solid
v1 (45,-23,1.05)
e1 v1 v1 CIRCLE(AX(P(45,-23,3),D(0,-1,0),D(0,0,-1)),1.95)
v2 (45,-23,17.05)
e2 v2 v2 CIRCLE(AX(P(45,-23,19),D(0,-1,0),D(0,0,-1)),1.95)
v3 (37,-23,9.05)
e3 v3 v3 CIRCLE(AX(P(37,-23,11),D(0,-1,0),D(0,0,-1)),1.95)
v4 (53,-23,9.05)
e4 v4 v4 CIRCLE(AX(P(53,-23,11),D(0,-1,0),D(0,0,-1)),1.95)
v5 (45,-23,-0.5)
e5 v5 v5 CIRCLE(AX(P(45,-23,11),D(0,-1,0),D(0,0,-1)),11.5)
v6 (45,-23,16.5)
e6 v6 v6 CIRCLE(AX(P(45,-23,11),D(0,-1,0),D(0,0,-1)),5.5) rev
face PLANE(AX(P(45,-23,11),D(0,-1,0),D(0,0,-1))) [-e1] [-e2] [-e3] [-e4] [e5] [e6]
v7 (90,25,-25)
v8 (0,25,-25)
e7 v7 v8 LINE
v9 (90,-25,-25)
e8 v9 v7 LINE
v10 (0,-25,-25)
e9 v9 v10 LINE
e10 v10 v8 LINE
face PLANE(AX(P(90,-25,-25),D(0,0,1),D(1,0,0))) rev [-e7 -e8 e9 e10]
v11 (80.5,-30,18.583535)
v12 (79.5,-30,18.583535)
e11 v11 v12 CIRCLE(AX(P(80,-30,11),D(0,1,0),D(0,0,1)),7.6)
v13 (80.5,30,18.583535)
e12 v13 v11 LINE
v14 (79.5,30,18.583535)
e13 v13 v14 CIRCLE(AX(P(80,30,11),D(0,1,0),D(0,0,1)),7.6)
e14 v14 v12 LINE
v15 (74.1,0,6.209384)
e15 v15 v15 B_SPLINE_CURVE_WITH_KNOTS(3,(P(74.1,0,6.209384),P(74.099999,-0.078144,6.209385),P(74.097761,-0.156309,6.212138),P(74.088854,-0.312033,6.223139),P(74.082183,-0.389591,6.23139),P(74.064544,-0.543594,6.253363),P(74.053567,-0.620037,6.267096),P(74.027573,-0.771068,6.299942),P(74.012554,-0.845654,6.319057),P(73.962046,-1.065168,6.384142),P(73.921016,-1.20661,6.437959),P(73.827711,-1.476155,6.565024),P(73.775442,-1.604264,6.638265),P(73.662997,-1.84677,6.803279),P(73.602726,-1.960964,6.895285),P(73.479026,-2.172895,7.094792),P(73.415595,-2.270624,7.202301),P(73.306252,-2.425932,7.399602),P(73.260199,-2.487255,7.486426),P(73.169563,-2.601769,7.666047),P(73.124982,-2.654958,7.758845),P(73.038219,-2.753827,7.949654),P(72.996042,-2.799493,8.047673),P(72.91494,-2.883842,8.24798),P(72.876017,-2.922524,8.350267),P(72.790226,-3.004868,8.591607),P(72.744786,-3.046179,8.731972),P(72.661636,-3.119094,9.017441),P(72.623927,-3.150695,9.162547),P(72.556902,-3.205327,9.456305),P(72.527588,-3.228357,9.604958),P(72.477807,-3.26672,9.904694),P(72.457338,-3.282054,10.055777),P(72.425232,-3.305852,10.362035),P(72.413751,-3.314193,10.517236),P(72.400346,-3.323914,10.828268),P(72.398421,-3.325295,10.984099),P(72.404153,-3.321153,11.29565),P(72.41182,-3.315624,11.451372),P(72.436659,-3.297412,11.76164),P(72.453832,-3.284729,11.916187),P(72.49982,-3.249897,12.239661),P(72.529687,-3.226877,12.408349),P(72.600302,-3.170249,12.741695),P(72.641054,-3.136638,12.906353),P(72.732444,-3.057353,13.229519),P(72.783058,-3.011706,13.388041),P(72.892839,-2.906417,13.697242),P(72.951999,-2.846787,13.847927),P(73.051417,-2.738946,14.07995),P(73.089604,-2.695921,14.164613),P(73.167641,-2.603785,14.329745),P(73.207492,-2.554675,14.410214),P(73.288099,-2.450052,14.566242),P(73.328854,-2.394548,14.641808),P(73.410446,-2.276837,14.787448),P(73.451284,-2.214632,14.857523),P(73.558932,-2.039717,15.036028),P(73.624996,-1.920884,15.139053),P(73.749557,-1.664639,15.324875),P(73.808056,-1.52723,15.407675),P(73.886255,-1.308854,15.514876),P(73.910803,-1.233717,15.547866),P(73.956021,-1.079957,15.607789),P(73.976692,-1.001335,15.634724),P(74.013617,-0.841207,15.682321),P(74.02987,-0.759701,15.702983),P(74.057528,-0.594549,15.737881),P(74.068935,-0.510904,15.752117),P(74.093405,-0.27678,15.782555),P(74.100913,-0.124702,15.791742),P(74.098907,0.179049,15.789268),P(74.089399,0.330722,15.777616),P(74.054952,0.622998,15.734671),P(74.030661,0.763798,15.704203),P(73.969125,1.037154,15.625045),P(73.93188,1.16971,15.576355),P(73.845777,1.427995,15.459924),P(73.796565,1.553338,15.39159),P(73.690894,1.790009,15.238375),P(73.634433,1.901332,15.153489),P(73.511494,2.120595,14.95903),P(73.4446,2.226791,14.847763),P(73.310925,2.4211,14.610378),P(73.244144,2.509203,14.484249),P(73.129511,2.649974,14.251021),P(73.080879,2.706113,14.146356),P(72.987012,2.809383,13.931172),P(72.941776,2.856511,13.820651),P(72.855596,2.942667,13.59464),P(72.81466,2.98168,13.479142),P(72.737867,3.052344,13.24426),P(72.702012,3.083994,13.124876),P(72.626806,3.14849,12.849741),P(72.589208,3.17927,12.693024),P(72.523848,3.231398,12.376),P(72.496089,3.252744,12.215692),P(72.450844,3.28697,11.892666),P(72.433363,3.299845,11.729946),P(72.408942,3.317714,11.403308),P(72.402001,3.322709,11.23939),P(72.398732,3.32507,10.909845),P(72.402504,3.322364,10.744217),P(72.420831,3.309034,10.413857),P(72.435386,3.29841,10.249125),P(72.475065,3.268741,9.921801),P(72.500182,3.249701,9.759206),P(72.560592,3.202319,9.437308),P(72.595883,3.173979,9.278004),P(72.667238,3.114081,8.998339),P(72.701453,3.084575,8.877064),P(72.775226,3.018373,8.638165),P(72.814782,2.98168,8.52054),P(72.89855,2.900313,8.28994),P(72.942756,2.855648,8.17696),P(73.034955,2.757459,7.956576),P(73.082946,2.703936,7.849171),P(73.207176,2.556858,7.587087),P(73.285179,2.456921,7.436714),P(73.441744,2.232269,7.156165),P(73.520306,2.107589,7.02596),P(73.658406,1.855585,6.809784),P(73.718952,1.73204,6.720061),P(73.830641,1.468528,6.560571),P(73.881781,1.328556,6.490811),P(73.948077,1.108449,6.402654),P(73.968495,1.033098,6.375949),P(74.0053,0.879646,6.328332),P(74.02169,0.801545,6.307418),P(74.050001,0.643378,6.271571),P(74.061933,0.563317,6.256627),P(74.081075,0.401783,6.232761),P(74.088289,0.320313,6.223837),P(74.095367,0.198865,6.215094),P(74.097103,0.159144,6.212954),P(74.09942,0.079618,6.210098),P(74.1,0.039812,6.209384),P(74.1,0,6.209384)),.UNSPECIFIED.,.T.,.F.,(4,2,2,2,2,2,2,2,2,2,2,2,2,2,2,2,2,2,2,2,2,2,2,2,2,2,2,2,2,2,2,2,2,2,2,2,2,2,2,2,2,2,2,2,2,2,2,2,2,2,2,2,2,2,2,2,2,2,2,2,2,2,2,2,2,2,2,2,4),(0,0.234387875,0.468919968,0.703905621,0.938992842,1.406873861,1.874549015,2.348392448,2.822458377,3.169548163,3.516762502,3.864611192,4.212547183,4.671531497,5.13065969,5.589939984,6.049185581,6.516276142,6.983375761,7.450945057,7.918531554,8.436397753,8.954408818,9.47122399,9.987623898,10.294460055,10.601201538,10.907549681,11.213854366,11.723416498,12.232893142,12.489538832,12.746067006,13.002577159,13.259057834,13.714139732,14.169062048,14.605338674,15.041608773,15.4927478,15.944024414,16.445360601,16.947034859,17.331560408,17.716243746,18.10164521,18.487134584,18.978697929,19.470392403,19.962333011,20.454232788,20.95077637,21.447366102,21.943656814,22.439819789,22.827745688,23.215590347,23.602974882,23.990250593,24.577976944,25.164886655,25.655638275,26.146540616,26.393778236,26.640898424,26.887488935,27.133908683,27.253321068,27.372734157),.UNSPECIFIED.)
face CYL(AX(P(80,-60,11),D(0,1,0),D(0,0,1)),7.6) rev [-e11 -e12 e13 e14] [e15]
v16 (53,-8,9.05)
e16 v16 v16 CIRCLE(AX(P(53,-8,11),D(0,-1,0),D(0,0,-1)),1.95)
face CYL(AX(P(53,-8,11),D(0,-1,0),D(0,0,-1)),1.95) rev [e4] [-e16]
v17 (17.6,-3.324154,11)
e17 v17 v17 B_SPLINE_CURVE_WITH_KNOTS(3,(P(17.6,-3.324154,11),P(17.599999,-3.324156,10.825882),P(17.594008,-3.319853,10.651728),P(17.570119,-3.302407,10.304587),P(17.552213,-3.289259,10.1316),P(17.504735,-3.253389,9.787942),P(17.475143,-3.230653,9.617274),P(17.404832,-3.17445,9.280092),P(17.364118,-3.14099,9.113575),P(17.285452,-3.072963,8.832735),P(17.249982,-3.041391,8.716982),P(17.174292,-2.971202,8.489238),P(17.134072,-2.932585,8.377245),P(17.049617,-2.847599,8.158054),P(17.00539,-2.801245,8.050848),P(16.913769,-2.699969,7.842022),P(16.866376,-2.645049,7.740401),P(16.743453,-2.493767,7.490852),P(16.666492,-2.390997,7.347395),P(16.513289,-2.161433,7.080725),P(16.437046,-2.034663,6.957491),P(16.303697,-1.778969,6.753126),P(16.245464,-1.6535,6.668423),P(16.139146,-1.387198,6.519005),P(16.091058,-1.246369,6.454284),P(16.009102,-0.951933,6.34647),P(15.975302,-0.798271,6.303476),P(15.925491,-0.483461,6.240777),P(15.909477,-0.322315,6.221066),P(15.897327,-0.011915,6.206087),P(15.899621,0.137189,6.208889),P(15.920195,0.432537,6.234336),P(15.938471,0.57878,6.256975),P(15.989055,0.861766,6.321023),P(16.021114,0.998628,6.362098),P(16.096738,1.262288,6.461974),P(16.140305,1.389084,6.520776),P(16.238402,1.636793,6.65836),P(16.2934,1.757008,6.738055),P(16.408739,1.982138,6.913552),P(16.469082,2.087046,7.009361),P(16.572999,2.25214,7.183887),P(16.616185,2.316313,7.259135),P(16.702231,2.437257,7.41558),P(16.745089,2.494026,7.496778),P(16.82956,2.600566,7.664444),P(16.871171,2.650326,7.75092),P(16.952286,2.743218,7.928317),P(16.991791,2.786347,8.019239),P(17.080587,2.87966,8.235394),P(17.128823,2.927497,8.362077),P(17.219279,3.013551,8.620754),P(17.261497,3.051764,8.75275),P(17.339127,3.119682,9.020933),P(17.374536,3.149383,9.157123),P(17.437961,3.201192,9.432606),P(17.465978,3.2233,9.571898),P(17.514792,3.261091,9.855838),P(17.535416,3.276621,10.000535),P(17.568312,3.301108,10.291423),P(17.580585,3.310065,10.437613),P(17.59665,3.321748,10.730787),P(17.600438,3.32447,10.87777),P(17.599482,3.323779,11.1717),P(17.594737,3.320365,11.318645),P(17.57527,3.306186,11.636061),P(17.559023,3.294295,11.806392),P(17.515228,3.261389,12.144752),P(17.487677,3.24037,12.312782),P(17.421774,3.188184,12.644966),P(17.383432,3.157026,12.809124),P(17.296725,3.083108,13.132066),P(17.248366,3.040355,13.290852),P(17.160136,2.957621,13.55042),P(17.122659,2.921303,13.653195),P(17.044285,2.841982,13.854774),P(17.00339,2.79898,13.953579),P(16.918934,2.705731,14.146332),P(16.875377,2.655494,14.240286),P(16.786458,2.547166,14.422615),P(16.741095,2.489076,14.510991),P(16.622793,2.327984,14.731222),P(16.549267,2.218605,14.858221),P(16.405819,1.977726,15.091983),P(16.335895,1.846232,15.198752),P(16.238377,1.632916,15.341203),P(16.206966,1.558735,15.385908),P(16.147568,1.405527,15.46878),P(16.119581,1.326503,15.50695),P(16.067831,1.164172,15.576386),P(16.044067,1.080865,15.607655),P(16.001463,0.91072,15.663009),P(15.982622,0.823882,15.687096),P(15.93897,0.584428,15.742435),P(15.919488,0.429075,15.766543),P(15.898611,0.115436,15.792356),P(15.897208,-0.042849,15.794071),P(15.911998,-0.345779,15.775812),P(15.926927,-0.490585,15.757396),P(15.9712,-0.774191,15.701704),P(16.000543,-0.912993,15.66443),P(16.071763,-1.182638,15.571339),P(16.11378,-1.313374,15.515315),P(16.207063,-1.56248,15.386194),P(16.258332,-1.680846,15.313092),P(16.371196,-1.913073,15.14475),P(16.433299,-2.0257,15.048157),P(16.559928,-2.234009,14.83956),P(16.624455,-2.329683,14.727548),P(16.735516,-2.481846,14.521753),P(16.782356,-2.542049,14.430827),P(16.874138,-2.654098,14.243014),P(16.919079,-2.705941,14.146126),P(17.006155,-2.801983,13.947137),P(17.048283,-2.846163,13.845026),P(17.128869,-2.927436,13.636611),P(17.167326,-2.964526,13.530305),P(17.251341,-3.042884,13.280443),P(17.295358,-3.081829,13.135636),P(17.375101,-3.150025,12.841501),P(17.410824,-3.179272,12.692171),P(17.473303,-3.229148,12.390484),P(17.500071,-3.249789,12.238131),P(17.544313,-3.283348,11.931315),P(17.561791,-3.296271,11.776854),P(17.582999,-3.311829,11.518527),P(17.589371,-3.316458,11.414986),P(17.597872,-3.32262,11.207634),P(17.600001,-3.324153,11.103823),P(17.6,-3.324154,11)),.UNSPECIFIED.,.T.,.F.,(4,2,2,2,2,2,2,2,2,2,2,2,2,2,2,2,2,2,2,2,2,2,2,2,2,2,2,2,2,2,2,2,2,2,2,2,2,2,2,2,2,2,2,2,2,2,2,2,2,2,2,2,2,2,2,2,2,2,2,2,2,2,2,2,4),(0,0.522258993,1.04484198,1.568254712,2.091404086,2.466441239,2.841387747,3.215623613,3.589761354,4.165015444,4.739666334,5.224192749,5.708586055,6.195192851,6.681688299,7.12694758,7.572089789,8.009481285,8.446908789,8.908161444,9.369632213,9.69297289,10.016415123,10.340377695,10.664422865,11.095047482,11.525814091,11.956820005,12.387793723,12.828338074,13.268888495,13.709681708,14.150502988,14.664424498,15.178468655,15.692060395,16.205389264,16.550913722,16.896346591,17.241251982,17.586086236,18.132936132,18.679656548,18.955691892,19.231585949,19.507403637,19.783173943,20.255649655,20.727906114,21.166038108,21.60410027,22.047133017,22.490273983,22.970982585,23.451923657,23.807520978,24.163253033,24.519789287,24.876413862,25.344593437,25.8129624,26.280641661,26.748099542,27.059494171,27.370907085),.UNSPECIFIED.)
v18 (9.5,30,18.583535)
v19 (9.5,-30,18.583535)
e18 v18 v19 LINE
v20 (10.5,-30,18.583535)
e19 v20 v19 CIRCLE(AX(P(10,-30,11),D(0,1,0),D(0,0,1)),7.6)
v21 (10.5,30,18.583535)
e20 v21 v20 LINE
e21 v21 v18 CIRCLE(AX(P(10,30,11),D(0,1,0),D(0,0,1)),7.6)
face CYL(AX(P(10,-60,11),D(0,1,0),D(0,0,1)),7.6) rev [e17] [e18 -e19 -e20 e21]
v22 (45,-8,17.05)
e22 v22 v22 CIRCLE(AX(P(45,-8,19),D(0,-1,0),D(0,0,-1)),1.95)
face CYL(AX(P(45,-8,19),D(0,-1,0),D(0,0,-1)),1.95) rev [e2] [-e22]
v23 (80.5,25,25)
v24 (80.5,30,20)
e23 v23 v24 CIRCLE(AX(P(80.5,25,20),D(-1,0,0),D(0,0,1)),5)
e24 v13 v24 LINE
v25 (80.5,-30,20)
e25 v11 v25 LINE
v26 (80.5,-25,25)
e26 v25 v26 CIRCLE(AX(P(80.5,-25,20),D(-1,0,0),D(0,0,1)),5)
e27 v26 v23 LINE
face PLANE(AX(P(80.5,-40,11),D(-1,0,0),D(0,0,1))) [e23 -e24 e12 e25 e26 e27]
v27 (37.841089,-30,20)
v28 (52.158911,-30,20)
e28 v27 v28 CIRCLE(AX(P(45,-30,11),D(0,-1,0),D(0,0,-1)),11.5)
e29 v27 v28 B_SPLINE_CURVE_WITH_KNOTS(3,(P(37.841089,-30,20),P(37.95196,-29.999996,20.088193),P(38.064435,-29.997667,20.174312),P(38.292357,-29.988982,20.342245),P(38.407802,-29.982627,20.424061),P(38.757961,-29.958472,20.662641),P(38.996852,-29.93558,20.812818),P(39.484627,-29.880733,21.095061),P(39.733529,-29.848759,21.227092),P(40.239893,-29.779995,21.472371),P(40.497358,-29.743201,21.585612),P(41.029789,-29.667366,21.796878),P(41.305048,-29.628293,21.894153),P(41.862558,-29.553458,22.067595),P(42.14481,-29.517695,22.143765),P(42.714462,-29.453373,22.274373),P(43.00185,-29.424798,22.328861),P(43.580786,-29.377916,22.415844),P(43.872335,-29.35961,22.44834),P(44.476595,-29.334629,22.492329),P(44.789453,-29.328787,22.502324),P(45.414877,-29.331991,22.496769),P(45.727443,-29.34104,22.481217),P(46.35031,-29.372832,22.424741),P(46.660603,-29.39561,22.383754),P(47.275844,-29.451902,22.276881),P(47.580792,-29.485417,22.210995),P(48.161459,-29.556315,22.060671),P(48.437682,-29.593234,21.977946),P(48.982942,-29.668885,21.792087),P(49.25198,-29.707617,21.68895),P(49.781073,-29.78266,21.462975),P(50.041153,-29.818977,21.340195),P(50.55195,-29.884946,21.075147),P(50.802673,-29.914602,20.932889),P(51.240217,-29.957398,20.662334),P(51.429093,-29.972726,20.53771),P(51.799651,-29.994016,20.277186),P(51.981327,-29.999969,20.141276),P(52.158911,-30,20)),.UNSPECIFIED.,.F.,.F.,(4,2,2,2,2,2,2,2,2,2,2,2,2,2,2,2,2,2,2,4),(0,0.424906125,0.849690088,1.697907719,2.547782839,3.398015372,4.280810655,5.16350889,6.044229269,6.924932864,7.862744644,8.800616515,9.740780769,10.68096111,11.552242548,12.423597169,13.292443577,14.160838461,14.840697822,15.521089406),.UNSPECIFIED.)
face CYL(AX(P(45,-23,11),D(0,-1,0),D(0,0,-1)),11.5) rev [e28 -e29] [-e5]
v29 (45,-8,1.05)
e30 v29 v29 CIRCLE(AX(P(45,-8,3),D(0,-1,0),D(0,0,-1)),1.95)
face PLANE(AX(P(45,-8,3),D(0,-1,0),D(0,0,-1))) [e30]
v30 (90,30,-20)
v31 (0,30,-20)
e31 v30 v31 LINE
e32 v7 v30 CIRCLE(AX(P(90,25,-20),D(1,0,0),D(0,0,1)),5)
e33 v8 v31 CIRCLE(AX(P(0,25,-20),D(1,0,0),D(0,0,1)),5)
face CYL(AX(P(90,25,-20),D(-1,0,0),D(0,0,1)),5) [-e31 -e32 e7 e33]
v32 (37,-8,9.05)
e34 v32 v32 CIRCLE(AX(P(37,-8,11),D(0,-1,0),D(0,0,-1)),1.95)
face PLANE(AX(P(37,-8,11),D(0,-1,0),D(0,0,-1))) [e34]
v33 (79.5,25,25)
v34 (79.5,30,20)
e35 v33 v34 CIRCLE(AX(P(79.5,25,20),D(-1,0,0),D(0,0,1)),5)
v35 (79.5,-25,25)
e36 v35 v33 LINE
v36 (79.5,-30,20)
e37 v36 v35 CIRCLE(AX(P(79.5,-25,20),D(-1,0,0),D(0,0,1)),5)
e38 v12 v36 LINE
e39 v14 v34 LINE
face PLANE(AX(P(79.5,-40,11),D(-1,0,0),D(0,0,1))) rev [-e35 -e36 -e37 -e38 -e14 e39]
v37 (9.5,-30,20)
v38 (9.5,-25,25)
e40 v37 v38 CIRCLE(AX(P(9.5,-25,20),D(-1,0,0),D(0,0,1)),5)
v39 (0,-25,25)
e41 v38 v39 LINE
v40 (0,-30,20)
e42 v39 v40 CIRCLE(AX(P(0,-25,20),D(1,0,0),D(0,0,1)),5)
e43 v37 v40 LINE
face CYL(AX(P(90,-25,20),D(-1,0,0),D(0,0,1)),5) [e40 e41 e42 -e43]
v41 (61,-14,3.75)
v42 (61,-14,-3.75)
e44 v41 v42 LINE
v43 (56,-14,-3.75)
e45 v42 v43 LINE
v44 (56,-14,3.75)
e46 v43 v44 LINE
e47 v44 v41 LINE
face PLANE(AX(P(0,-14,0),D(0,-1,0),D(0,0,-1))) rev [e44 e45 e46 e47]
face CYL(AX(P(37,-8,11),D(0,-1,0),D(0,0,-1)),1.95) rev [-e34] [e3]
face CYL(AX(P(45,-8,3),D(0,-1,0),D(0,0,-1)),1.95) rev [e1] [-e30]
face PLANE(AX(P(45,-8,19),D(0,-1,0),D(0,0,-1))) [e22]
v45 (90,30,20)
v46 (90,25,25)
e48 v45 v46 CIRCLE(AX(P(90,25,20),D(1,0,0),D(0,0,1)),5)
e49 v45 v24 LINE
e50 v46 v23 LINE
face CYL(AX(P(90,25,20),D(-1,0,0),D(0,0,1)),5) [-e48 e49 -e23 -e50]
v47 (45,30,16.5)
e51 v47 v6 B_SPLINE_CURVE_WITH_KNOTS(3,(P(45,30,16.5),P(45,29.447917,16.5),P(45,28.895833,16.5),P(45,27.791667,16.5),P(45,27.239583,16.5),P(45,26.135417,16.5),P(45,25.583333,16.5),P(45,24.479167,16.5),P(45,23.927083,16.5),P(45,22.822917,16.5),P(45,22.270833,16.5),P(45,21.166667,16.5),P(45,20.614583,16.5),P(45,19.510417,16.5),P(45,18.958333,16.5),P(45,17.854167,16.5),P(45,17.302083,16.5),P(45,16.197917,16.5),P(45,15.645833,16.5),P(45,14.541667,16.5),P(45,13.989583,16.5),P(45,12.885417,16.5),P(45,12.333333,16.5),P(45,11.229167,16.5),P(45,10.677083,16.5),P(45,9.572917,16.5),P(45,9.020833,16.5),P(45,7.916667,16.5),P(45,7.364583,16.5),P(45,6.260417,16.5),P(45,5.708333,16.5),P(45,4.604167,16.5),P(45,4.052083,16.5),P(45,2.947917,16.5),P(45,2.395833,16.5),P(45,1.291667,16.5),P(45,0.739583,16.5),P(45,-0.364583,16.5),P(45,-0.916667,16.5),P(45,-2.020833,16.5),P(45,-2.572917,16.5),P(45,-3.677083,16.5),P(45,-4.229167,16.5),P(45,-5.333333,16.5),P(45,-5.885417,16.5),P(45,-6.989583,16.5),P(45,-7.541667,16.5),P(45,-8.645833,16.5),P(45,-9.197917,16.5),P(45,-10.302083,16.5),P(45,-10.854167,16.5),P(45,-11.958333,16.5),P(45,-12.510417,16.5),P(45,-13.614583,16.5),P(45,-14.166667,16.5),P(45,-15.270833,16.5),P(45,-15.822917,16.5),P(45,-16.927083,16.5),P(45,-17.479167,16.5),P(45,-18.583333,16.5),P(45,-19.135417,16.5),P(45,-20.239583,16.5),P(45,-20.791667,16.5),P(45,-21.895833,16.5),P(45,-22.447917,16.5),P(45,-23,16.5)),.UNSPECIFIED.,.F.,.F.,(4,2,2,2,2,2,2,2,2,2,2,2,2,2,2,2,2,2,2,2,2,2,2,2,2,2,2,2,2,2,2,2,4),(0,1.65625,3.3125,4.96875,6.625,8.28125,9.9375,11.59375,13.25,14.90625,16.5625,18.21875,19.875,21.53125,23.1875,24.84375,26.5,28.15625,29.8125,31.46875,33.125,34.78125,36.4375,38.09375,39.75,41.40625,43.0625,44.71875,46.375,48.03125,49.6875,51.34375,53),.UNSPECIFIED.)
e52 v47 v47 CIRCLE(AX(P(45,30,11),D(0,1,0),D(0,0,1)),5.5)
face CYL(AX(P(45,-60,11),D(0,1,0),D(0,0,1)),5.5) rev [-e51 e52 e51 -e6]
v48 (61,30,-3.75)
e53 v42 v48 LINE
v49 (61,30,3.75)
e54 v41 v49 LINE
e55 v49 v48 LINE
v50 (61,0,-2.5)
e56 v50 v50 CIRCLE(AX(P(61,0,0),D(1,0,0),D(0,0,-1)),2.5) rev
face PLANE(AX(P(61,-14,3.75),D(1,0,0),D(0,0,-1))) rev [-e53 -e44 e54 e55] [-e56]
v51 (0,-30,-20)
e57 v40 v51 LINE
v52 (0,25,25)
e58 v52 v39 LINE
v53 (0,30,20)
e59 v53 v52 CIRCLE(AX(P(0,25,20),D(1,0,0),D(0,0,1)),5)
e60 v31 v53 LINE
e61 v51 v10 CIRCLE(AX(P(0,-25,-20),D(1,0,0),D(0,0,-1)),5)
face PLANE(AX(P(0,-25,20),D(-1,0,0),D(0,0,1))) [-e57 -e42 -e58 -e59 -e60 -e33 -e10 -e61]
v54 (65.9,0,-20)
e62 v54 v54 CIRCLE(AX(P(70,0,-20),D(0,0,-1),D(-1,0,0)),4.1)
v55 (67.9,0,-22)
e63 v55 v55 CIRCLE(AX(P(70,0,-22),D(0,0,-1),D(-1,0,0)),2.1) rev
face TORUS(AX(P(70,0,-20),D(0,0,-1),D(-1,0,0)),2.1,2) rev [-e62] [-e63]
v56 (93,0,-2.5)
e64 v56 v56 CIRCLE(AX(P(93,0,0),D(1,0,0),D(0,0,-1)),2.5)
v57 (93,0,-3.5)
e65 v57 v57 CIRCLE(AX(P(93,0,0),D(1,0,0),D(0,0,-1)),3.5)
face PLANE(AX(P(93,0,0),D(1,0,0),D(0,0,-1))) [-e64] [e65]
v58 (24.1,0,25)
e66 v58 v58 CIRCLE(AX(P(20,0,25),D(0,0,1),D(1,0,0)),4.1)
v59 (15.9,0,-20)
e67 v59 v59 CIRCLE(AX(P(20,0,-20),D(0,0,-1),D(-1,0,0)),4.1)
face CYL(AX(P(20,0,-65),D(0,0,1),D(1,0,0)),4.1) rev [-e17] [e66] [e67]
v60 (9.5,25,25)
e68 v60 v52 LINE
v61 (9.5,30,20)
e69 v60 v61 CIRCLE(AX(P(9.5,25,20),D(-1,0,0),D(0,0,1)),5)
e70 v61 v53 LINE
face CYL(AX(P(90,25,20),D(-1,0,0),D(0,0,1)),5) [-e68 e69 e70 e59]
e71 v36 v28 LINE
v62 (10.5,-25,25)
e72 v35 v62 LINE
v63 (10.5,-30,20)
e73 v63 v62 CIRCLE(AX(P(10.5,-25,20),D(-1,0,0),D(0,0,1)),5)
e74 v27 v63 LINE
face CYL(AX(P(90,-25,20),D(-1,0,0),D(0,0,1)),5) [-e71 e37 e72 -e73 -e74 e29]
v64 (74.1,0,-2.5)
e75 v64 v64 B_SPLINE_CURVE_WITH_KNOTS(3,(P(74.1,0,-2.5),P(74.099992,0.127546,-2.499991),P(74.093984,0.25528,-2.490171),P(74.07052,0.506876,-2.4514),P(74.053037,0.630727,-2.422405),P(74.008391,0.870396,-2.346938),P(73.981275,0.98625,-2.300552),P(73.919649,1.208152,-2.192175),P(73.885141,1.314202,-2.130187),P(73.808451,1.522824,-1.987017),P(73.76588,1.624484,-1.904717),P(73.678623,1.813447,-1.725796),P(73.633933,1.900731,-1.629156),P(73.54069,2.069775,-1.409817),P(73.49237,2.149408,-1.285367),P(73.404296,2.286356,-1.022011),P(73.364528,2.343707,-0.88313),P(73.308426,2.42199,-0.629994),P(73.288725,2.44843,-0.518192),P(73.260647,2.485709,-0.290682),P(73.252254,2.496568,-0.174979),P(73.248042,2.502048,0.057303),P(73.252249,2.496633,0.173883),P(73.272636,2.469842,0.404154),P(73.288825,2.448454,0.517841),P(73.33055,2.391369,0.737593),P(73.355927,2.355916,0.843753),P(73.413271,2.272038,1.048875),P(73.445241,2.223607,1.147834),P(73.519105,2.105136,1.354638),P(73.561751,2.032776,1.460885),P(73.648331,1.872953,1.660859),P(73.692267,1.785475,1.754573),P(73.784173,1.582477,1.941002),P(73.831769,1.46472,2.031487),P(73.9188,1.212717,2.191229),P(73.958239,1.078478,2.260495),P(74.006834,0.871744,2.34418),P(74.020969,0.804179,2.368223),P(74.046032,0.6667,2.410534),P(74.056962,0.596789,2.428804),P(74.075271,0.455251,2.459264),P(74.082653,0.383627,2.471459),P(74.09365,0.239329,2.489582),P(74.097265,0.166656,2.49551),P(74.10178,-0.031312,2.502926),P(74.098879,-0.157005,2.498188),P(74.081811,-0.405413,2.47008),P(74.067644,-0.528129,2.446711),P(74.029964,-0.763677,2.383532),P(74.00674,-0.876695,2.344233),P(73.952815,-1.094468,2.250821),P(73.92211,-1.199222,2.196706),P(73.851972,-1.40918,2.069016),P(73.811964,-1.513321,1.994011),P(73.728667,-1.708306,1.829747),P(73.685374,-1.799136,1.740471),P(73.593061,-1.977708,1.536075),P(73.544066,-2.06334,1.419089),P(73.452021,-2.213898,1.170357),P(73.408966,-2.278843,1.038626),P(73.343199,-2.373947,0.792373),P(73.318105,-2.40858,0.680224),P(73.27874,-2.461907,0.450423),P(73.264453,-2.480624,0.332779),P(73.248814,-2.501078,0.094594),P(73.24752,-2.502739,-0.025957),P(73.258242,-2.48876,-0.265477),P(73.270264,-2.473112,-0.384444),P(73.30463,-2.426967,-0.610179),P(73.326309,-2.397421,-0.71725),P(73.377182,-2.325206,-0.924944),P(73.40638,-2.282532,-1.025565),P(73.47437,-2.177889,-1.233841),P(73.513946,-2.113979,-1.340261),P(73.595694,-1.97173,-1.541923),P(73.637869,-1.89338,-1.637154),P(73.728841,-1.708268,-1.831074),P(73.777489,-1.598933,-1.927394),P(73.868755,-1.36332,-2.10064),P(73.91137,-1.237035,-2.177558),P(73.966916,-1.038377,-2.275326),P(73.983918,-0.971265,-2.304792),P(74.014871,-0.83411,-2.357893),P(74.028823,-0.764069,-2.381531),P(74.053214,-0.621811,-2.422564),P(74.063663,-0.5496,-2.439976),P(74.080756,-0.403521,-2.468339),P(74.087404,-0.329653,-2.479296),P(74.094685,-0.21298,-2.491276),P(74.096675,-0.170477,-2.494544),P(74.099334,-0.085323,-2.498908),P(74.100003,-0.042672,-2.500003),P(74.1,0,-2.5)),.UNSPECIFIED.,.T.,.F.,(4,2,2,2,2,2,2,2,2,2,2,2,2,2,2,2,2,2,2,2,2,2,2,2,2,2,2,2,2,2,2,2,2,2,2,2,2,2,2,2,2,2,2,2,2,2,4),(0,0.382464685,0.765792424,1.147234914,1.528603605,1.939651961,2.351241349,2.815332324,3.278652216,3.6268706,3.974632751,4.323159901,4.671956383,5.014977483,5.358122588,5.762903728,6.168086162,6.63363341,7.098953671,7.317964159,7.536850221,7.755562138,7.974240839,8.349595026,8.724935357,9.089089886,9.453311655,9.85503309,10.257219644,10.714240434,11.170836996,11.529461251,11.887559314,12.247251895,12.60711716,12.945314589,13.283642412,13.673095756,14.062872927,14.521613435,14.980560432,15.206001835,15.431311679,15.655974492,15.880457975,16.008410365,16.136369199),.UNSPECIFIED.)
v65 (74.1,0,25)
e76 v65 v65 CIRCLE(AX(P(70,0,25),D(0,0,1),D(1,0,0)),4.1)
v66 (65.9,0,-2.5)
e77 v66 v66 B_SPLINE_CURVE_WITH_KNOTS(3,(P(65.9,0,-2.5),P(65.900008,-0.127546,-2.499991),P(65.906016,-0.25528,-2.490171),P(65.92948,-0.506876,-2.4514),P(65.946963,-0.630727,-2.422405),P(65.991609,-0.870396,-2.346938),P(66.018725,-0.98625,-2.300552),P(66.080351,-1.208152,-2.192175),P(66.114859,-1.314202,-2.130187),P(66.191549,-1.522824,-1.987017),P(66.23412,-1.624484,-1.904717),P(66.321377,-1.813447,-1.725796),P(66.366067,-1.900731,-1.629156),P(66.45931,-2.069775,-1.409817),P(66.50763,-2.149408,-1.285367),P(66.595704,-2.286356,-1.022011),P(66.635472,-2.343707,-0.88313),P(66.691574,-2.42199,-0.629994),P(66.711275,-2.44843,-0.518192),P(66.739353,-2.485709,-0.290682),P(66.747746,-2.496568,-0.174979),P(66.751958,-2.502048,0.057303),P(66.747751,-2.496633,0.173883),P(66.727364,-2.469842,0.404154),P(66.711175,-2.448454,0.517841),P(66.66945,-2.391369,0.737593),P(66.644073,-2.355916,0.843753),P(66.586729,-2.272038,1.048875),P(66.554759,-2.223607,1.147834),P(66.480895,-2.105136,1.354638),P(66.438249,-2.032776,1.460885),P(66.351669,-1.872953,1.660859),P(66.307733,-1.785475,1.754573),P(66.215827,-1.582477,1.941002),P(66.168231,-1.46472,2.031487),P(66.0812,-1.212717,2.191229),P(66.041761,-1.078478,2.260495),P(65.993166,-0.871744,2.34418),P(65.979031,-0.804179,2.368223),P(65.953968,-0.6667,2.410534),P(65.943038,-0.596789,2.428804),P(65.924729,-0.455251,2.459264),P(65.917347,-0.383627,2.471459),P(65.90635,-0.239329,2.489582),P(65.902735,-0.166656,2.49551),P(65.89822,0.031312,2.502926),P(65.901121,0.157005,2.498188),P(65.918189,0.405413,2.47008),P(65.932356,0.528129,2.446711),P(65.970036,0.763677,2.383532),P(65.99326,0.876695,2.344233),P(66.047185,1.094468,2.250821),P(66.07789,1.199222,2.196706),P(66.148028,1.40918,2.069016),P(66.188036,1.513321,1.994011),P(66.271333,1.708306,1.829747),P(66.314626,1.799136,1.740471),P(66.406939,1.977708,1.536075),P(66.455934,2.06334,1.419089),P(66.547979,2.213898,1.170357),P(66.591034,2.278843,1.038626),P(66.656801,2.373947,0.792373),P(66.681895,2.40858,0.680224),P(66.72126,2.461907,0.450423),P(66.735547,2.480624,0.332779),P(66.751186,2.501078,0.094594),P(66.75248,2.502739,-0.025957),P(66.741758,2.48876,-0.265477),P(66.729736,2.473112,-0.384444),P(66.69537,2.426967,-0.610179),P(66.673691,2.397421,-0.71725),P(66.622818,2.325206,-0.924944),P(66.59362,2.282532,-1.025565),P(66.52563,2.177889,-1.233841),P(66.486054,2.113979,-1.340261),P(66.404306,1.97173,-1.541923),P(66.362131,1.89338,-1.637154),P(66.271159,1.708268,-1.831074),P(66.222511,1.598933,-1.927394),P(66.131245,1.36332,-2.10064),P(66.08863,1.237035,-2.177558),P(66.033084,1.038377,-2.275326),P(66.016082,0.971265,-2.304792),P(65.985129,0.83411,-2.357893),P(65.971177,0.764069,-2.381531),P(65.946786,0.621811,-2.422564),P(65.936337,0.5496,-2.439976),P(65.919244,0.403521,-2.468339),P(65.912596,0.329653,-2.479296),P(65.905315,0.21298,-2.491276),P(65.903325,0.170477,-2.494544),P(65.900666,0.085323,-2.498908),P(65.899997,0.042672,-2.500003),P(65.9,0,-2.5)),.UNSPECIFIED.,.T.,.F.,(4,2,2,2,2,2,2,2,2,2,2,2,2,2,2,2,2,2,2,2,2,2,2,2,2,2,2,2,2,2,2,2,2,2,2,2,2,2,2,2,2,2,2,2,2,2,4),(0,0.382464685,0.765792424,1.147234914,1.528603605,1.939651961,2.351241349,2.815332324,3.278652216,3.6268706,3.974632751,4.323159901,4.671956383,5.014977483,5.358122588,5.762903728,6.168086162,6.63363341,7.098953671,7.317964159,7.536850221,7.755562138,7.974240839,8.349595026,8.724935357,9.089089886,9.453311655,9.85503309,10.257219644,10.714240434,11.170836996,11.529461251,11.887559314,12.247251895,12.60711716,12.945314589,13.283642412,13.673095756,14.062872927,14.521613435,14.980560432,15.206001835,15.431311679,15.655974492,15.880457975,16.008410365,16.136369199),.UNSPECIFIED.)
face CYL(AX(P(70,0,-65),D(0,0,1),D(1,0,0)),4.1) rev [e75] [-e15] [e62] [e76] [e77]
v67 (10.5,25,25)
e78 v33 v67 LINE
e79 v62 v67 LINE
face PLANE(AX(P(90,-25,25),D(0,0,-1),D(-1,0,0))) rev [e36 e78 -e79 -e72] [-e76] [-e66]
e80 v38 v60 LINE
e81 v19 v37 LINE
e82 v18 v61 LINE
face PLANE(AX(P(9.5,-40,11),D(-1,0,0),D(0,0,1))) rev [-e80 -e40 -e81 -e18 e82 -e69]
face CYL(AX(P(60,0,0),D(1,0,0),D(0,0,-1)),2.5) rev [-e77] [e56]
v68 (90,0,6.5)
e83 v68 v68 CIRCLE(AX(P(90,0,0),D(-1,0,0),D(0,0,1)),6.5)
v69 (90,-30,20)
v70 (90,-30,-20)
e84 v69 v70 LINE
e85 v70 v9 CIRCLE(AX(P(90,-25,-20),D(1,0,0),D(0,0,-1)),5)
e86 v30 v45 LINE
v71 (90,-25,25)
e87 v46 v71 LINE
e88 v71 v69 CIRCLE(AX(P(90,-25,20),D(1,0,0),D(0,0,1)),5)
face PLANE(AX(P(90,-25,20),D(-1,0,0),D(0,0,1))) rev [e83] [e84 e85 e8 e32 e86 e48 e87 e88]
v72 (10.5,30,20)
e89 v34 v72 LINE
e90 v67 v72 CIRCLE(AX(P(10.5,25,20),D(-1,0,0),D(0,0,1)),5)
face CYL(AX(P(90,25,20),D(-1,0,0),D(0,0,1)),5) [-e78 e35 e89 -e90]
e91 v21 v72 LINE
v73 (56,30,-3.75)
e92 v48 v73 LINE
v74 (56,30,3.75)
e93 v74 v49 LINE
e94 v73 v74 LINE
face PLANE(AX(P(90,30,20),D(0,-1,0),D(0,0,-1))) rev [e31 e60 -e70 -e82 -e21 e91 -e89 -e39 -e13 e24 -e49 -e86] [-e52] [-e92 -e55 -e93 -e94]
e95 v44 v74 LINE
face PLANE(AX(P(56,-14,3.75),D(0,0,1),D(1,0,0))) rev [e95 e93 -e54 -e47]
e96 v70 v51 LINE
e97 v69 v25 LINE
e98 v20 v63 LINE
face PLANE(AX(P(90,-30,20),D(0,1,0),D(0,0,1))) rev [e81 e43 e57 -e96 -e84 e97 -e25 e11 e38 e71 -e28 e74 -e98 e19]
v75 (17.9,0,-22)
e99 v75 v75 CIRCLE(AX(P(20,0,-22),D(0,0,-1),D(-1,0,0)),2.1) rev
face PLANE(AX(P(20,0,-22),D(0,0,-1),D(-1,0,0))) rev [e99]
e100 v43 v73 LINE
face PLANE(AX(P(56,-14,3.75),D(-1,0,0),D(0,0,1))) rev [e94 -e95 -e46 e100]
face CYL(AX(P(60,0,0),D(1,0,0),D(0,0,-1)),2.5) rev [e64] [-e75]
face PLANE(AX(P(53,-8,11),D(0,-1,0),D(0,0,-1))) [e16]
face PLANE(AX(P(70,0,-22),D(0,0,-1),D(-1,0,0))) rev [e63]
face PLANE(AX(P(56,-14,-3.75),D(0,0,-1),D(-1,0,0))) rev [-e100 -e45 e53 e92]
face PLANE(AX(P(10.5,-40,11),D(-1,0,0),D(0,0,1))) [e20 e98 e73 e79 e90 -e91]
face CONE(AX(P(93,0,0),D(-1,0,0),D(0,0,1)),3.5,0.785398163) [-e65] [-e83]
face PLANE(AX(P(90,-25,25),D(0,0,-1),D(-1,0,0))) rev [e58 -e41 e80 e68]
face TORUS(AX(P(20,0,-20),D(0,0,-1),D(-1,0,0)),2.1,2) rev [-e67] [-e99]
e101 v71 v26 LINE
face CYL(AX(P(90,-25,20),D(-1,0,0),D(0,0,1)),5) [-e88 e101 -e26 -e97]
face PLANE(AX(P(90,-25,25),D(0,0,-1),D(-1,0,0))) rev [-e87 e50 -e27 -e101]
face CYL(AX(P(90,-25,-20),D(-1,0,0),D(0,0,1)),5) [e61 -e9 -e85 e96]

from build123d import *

# Parameters (mm, degrees)
BOSS_EXTRUDE1_DEPTH     = 90
SKETCH2_R               = 7.6
SKETCH2_R_2             = 5.5
CUT_EXTRUDE1_DEPTH      = 90
SKETCH3_R               = 4.1
CUT_EXTRUDE2_DEPTH      = 90
SKETCH10_W              = 1
SKETCH10_H              = 31.35052841
CUT_EXTRUDE_THIN1_DEPTH = 70
SKETCH11_R              = 11.5
CUT_EXTRUDE6_DEPTH      = 7
SKETCH12_R              = 1.95
CUT_EXTRUDE7_DEPTH      = 15
BOSS_EXTRUDE2_START     = -3
SKETCH16_R              = 4.1
BOSS_EXTRUDE2_DEPTH     = 3
FILLET1_R               = 2
SKETCH17_R              = 2.5
CUT_EXTRUDE8_DEPTH      = 30
SKETCH18_W              = 5
SKETCH18_H              = 7.5
CUT_EXTRUDE9_DEPTH      = 44
BOSS_EXTRUDE3_START     = 3
SKETCH19_R              = 3.5
SKETCH19_R_2            = 2.5
BOSS_EXTRUDE3_DEPTH     = 3
CHAMFER1_SIZE           = 3


with BuildPart() as part:
    # Sketch1 → Boss-Extrude1 (new body)
    with BuildSketch(Plane(origin=(0, 0, 0), x_dir=(0, 0, -1), z_dir=(1, 0, 0))):
        with BuildLine():
            Line((-20, -30), (20, -30))
            ThreePointArc((20, -30), (23.535533906, -28.535533906), (25, -25))
            Line((25, -25), (25, 25))
            ThreePointArc((25, 25), (23.535533906, 28.535533906), (20, 30))
            Line((20, 30), (-20, 30))
            ThreePointArc((-20, 30), (-23.535533906, 28.535533906), (-25, 25))
            Line((-25, 25), (-25, -25))
            ThreePointArc((-25, -25), (-23.535533906, -28.535533906), (-20, -30))
        make_face()
    extrude(amount=BOSS_EXTRUDE1_DEPTH)

    # Sketch2 → Cut-Extrude1 (cut)
    with BuildSketch(Plane(origin=(0, 30, 0), x_dir=(1, 0, 0), z_dir=(0, 1, 0))):
        with Locations(Location((10, -11, 0), (0, 0, 270))):
            Circle(SKETCH2_R)
        with Locations(Location((80, -11, 0), (0, 0, 270))):
            Circle(SKETCH2_R)
        with Locations(Location((45, -11, 0), (0, 0, 270))):
            Circle(SKETCH2_R_2)
    extrude(amount=-CUT_EXTRUDE1_DEPTH, mode=Mode.SUBTRACT)

    # Sketch3 → Cut-Extrude2 (cut)
    with BuildSketch(Plane.XY.offset(25)):
        with Locations((20, 0)):
            Circle(SKETCH3_R)
        with Locations((70, 0)):
            Circle(SKETCH3_R)
    extrude(amount=-CUT_EXTRUDE2_DEPTH, mode=Mode.SUBTRACT)

    # Sketch10 → Cut-Extrude-Thin1 (cut)
    with BuildSketch(Plane(origin=(0, 30, 0), x_dir=(1, 0, 0), z_dir=(0, 1, 0))):
        with Locations((10, -26.675264205)):
            Rectangle(SKETCH10_W, SKETCH10_H)
        with Locations((80, -26.675264205)):
            Rectangle(SKETCH10_W, SKETCH10_H)
    extrude(amount=-CUT_EXTRUDE_THIN1_DEPTH, mode=Mode.SUBTRACT)

    # Sketch11 → Cut-Extrude6 (cut)
    with BuildSketch(Plane(origin=(0, -30, 0), x_dir=(-1, 0, 0), z_dir=(0, -1, 0))):
        with Locations(Location((-45, -11, 0), (0, 0, 90))):
            Circle(SKETCH11_R)
    extrude(amount=-CUT_EXTRUDE6_DEPTH, mode=Mode.SUBTRACT)

    # Sketch12 → Cut-Extrude7 (cut)
    with BuildSketch(Plane(origin=(0, -23, 0), x_dir=(-1, 0, 0), z_dir=(0, -1, 0))):
        with Locations(Location((-45, -19, 0), (0, 0, 90))):
            Circle(SKETCH12_R)
        with Locations(Location((-53, -11, 0), (0, 0, 90))):
            Circle(SKETCH12_R)
        with Locations(Location((-45, -3, 0), (0, 0, 90))):
            Circle(SKETCH12_R)
        with Locations(Location((-37, -11, 0), (0, 0, 90))):
            Circle(SKETCH12_R)
    extrude(amount=-CUT_EXTRUDE7_DEPTH, mode=Mode.SUBTRACT)

    # Sketch16 → Boss-Extrude2 (add)
    with BuildSketch(Plane(origin=(0, 0, -25), x_dir=(-1, 0, 0), z_dir=(0, 0, -1)).offset(BOSS_EXTRUDE2_START)):
        with Locations(Location((-70, 0, 0), (0, 0, 180))):
            Circle(SKETCH16_R)
        with Locations(Location((-20, 0, 0), (0, 0, 180))):
            Circle(SKETCH16_R)
    extrude(amount=BOSS_EXTRUDE2_DEPTH)

    # Fillet1
    fillet1_edges = [part.edges().sort_by_distance(p)[0] for p in [
        (65.9, 0, -22),
        (15.9, 0, -22),
    ]]
    fillet(fillet1_edges, radius=FILLET1_R)

    # Sketch17 → Cut-Extrude8 (cut)
    with BuildSketch(Plane(origin=(90, 0, 0), x_dir=(0, 0, -1), z_dir=(1, 0, 0))):
        Circle(SKETCH17_R)
    extrude(amount=-CUT_EXTRUDE8_DEPTH, mode=Mode.SUBTRACT)

    # Sketch18 → Cut-Extrude9 (cut)
    with BuildSketch(Plane(origin=(0, 30, 0), x_dir=(1, 0, 0), z_dir=(0, 1, 0))):
        with Locations((58.5, 0)):
            Rectangle(SKETCH18_W, SKETCH18_H)
    extrude(amount=-CUT_EXTRUDE9_DEPTH, mode=Mode.SUBTRACT)

    # Sketch19 → Boss-Extrude3 (add)
    with BuildSketch(Plane(origin=(90, 0, 0), x_dir=(0, 0, -1), z_dir=(1, 0, 0)).offset(BOSS_EXTRUDE3_START)):
        with Locations(Location((0, 0, 0), (0, 0, 180))):
            Circle(SKETCH19_R)
        Circle(SKETCH19_R_2, mode=Mode.SUBTRACT)
    extrude(amount=-BOSS_EXTRUDE3_DEPTH)

    # Chamfer1
    chamfer1_edges = [part.edges().sort_by_distance(p)[0] for p in [
        (90, 0, -3.5),
    ]]
    chamfer(chamfer1_edges, length=CHAMFER1_SIZE - 0.0001)  # a hair under: the kernel refuses the full size


solid = part.part
